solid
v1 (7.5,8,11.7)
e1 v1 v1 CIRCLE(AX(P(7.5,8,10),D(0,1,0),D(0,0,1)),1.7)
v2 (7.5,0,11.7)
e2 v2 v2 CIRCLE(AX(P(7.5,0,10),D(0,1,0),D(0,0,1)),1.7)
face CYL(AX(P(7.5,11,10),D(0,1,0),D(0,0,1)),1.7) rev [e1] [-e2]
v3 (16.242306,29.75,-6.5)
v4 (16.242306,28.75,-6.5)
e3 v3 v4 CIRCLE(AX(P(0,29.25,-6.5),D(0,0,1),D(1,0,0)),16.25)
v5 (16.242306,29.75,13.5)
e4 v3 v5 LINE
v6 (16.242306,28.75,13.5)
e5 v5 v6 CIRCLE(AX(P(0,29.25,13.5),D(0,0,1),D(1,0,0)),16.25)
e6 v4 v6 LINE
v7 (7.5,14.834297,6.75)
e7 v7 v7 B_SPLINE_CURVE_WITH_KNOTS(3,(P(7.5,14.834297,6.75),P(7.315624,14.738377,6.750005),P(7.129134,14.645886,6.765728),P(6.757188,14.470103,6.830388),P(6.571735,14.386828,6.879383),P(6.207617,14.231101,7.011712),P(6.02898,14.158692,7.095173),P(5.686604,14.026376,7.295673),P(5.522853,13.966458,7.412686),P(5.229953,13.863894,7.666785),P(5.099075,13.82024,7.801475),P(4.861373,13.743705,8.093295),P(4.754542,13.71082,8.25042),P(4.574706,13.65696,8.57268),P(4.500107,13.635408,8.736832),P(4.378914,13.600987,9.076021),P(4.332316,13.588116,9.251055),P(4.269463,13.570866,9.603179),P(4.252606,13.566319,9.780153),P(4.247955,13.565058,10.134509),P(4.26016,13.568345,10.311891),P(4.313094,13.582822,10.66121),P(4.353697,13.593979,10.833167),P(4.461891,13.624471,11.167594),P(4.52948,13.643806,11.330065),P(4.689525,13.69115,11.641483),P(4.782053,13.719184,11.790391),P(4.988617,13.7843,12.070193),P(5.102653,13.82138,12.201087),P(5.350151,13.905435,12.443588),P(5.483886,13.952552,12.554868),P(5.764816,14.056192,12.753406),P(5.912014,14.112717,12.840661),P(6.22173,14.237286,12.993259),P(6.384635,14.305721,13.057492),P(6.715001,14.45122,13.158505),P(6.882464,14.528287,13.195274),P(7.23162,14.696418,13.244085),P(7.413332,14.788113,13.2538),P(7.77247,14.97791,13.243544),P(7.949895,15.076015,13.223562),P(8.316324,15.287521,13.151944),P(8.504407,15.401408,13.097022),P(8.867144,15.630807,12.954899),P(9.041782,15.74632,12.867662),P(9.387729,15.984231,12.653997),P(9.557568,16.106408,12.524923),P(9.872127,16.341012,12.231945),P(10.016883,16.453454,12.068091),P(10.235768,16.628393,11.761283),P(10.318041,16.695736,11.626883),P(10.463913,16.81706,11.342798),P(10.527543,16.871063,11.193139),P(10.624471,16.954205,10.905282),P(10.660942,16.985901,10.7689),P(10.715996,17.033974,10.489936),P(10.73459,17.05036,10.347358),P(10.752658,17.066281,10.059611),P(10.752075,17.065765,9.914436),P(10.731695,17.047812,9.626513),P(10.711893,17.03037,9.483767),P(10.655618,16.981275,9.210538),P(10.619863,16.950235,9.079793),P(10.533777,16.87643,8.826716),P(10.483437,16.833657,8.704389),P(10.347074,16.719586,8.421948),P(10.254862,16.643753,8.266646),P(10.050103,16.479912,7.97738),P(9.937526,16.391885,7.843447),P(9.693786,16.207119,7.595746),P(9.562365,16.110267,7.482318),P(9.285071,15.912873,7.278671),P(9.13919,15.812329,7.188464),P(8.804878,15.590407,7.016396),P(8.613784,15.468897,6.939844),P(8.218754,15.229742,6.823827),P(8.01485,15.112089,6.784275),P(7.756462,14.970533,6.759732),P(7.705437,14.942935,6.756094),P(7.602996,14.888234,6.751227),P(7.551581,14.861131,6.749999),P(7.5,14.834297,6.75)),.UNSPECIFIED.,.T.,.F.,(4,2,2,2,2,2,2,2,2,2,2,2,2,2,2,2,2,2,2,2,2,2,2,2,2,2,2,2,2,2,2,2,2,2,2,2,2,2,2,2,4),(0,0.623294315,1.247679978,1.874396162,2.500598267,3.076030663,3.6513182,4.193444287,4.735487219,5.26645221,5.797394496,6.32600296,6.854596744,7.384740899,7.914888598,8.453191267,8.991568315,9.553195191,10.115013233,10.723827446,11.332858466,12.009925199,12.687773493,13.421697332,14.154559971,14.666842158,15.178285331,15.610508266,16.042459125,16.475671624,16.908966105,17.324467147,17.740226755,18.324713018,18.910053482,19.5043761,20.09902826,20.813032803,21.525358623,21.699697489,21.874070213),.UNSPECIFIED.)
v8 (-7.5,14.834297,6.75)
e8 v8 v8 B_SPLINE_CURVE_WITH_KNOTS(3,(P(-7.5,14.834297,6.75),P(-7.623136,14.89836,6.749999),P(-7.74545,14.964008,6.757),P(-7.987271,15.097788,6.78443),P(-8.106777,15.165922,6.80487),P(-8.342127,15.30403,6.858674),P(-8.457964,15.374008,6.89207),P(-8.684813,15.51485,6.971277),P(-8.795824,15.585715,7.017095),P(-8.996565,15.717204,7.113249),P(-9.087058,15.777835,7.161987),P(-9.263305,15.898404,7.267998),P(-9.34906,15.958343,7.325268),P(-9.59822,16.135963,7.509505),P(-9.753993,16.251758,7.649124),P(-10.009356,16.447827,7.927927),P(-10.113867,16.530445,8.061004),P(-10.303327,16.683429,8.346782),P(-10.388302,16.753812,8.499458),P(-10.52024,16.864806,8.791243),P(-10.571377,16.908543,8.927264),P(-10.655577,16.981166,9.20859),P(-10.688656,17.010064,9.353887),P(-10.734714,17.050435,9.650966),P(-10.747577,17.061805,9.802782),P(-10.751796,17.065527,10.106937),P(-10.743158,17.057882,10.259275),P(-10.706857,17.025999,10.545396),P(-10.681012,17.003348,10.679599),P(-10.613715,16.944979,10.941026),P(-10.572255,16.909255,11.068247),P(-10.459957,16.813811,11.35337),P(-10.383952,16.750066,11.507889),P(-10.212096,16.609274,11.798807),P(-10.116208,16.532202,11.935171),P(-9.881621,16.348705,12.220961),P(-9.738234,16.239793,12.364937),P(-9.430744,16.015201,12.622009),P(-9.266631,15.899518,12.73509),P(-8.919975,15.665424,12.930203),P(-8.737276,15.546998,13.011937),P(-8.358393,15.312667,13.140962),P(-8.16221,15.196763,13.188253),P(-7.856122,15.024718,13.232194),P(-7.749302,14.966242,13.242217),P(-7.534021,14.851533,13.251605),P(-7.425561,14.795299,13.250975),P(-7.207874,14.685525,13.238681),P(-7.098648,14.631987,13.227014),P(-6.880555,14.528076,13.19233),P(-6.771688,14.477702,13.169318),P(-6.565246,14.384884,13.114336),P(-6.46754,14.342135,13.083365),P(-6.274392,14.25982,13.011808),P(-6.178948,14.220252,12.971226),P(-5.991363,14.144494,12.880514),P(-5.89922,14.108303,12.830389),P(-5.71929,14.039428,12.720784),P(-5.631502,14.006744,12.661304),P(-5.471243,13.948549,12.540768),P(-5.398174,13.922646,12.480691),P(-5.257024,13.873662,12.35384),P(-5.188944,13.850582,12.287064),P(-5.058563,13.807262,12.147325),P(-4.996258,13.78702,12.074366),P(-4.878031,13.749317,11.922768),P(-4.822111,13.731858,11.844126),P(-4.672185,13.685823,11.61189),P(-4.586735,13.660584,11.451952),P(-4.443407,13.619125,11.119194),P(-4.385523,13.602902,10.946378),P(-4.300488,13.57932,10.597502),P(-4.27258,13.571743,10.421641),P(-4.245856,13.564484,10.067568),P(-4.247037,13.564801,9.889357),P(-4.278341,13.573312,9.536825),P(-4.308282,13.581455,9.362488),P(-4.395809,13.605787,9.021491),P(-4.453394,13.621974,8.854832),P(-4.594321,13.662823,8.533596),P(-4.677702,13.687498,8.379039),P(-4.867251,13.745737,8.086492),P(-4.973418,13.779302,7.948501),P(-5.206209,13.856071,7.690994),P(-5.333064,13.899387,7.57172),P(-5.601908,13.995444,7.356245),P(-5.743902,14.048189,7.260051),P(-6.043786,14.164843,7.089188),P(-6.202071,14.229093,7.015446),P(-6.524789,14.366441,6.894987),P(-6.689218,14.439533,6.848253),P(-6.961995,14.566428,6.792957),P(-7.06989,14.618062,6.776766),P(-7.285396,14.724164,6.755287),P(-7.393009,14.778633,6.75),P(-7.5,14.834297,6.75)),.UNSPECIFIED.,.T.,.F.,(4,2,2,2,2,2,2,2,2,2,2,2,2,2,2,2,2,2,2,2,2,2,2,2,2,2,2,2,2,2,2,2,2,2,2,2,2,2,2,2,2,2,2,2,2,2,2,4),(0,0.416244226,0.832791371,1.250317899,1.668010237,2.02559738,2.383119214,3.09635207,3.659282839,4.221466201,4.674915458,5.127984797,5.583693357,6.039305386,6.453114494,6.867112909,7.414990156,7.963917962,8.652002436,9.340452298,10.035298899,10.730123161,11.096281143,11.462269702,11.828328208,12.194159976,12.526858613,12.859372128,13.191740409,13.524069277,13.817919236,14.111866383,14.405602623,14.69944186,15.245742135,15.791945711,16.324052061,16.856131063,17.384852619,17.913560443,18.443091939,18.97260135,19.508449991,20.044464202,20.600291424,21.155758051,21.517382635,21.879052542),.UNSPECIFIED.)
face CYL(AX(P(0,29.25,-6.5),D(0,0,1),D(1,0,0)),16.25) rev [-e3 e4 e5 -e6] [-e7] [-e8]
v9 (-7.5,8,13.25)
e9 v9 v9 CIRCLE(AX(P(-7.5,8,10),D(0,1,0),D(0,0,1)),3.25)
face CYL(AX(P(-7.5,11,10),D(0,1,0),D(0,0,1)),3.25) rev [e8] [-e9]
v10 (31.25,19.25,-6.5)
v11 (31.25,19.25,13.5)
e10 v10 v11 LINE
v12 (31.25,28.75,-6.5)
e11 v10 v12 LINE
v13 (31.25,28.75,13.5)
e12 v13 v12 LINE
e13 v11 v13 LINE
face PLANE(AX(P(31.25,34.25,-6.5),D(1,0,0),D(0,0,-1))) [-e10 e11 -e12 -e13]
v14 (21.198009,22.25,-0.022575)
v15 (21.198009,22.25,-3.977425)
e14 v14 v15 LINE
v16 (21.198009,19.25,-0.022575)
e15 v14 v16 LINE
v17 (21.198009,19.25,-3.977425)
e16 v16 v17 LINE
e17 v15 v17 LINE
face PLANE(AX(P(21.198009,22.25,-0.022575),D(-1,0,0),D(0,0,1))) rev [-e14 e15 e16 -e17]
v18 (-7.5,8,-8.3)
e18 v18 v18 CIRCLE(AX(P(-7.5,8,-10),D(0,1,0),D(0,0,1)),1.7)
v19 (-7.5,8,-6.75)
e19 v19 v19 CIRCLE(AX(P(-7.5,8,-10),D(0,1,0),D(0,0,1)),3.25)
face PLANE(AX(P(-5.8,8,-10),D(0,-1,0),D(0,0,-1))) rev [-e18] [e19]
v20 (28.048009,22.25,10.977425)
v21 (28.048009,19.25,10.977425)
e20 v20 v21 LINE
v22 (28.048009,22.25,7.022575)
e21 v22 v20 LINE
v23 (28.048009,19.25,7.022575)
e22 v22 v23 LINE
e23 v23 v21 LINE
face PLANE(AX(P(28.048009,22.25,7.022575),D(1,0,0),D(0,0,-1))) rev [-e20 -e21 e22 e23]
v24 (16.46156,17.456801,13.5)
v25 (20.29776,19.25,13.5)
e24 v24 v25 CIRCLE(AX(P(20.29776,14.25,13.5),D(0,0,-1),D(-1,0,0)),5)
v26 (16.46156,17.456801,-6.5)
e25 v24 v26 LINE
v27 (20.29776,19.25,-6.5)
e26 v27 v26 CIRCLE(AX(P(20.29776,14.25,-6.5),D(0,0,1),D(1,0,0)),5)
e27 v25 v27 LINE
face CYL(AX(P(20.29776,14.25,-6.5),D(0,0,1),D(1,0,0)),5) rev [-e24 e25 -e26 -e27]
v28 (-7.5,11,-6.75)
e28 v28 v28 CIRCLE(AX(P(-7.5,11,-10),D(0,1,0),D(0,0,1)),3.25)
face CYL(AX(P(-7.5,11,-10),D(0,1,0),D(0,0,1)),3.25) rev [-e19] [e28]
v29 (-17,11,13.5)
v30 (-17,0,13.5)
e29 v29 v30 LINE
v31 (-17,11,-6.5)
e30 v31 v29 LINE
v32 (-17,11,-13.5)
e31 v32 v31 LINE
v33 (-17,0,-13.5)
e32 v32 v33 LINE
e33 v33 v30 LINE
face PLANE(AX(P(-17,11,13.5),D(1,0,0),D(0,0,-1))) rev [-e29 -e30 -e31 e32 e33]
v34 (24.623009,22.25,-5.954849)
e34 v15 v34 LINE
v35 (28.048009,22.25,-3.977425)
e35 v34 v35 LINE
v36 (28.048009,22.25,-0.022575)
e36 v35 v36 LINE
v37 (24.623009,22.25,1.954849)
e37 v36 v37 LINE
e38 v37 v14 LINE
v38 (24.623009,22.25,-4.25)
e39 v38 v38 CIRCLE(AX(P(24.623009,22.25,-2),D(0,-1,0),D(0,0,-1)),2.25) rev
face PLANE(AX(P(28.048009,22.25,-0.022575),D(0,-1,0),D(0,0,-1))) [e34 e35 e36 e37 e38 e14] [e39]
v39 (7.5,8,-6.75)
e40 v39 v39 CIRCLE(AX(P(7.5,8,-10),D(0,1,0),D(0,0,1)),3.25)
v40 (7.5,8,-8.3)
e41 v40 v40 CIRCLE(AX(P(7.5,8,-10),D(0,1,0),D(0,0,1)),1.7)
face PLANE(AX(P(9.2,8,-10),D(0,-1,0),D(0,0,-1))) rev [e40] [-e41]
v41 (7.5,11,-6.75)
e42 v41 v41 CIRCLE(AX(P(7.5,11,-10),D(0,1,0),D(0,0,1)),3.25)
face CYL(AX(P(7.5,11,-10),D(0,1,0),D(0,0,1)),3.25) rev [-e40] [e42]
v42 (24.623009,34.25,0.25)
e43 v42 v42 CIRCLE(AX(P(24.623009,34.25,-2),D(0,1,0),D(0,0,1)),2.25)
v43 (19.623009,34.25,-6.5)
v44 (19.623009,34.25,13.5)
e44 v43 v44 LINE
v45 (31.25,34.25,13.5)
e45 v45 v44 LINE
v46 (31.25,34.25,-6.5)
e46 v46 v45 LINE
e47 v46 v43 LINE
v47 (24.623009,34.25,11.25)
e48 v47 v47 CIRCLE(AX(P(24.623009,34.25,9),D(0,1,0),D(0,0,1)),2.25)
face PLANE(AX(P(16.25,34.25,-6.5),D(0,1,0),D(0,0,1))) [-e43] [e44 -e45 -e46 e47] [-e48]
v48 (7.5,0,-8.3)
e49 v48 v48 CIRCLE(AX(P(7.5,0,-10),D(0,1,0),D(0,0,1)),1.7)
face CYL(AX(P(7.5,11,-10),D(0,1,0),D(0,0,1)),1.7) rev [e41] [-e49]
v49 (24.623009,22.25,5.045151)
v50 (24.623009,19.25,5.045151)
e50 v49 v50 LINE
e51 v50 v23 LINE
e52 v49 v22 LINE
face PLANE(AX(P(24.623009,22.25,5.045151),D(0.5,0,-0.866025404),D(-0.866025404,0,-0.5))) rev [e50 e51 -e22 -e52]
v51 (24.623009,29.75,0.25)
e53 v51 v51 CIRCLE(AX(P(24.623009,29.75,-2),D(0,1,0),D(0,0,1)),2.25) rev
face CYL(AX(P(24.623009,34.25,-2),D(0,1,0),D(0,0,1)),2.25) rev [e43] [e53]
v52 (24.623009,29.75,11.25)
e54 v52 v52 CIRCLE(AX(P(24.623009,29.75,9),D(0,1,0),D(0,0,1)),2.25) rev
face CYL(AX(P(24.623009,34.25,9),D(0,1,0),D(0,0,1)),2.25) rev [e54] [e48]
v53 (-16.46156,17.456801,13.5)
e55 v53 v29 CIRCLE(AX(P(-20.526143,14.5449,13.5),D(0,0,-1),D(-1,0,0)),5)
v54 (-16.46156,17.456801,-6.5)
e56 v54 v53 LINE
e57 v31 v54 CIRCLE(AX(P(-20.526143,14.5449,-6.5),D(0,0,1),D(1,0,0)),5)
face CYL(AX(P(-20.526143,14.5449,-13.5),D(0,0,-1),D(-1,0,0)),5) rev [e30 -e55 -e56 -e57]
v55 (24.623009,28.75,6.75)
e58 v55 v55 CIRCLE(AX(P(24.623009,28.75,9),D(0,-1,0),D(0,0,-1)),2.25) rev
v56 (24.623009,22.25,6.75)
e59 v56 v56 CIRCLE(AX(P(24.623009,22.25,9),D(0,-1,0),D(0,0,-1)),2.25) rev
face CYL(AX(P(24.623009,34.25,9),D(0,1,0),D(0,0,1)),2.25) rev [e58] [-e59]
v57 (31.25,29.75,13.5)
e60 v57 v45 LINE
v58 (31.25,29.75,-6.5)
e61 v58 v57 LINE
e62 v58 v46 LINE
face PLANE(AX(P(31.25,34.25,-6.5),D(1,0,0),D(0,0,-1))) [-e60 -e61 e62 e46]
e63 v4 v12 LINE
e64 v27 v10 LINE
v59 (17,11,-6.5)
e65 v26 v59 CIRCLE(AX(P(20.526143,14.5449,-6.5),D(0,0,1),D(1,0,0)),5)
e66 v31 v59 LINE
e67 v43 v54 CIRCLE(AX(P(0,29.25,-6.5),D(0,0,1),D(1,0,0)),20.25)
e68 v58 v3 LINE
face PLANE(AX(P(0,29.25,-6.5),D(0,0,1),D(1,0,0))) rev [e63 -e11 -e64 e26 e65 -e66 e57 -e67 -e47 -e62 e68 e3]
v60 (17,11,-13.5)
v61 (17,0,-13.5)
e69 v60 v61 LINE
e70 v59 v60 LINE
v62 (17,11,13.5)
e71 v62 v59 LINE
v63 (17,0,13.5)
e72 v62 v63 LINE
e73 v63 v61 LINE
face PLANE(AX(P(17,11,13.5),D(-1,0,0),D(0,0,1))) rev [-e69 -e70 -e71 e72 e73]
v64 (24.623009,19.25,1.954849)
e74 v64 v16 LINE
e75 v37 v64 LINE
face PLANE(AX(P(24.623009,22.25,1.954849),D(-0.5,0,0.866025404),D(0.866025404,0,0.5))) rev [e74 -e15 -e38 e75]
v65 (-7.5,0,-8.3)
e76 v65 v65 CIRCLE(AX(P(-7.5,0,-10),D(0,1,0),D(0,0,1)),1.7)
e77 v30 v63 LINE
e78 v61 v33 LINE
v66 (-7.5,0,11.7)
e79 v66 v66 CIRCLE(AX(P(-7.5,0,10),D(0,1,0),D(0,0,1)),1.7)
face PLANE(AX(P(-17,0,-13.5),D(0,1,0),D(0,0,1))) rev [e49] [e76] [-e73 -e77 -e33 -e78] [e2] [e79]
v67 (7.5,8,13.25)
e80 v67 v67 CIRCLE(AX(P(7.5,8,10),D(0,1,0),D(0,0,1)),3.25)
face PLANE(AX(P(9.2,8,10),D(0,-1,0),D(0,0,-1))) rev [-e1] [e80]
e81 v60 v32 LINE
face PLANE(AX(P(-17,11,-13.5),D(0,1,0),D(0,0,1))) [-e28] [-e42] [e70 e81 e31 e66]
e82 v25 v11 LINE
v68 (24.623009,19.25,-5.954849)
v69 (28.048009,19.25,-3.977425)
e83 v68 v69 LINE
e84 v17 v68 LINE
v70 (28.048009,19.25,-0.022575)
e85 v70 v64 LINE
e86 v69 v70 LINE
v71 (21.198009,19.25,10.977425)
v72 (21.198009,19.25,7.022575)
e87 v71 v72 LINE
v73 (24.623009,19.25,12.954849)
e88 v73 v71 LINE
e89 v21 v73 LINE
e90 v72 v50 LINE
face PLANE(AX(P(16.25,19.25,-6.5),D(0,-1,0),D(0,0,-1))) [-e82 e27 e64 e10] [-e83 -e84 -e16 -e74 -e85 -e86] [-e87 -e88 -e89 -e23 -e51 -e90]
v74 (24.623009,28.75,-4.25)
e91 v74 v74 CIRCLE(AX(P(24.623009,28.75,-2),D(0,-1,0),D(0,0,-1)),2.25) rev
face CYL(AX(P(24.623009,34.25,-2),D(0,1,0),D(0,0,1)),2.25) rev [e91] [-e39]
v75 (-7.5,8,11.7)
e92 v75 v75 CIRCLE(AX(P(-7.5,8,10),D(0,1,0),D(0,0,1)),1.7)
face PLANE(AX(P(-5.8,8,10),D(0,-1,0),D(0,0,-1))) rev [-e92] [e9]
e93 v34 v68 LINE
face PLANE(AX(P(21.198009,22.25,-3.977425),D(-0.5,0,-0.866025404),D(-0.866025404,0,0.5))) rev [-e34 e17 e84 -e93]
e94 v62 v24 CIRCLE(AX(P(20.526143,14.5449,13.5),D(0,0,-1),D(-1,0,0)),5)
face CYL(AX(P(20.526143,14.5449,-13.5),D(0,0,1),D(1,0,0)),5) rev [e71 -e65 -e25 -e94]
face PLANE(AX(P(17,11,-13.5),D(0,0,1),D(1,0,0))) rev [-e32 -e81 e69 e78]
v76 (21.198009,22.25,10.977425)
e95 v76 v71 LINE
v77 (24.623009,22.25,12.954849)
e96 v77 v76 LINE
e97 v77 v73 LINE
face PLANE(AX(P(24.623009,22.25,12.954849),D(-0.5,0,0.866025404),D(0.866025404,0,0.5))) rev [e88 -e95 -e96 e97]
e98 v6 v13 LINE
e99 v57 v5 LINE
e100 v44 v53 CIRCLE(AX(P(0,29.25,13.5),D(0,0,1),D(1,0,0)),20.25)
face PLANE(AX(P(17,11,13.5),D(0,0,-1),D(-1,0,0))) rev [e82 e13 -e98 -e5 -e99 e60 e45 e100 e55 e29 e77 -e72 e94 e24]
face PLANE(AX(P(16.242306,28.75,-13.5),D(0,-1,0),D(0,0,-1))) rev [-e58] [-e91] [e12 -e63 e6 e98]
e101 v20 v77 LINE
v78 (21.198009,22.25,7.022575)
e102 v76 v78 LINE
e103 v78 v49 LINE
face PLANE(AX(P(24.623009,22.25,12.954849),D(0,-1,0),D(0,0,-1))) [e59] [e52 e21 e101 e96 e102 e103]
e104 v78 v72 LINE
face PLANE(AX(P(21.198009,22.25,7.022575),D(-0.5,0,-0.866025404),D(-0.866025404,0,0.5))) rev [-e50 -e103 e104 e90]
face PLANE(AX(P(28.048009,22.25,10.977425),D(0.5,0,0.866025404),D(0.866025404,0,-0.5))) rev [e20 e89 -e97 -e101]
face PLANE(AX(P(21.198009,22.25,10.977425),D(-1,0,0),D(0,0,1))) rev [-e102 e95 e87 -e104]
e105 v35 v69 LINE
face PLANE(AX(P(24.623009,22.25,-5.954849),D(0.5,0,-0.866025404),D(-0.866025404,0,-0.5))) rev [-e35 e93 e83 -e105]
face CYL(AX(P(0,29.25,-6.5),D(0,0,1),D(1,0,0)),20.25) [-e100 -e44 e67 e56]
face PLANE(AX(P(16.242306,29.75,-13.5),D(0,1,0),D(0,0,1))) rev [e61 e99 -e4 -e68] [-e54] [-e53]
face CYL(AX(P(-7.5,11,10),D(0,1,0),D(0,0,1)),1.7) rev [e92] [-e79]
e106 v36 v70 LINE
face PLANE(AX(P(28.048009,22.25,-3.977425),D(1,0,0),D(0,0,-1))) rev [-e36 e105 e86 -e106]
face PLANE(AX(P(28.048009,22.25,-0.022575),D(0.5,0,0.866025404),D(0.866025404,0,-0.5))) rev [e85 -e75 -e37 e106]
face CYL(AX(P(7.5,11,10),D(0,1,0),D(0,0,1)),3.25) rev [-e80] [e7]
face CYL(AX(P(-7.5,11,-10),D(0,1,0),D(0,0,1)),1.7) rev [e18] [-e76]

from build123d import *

# Parameters (mm, degrees)
SKETCH1_W                     = 34
SKETCH1_H                     = 27
BOSS_EXTRUDE1_DEPTH           = 11
SKETCH2_R                     = 20.25
SKETCH2_R_2                   = 16.25
MOTOR_CLAMP_BAND_DEPTH        = 20
FILLET4_R                     = 5
SKETCH7_W                     = 15
SKETCH7_H                     = 15
BOSS_EXTRUDE3_DEPTH           = 20
FILLET5_R                     = 5
CBORE_FOR_M3_SHCS1_AT_2_COUNT = 2
CBORE_FOR_M3_SHCS1_AT_2_PITCH = 15
CBORE_FOR_M3_SHCS1_AT_3_COUNT = 2
CBORE_FOR_M3_SHCS1_AT_3_PITCH = 25
CBORE_FOR_M3_SHCS1_AT_4_COUNT = 2
CBORE_FOR_M3_SHCS1_AT_4_PITCH = 20
EXTENDED_START                = 15
SKETCH6_R                     = 3.25
EXTENDED_COUNTERBORE_1_DEPTH  = 15
M4_CLEARANCE_HOLE1_D          = 4.5
CUT_EXTRUDE2_DEPTH            = 3
SKETCH14_W                    = 15.007694129
SKETCH14_H                    = 1
CUT_EXTRUDE3_DEPTH            = 65.465591597
FILLET3_R                     = 5


with BuildPart() as part:
    # Sketch1 → Boss-Extrude1 (new body)
    with BuildSketch(Plane(origin=(0, 0, 0), x_dir=(1, 0, 0), z_dir=(0, 1, 0))):
        Rectangle(SKETCH1_W, SKETCH1_H)
    extrude(amount=BOSS_EXTRUDE1_DEPTH)

    # Sketch2 → Motor Clamp Band (add)
    with BuildSketch(Plane.XY.offset(13.5)):
        with Locations((0, 29.25)):
            Circle(SKETCH2_R)
        with Locations((0, 29.25)):
            Circle(SKETCH2_R_2, mode=Mode.SUBTRACT)
    extrude(amount=-MOTOR_CLAMP_BAND_DEPTH)

    # Fillet4
    # the kernel refuses this fillet: 5 mm, written as the material it adds along each edge
    with BuildSketch(Plane(origin=(8.774964387, 11, -6.5), x_dir=(0.7657018852259857, 0.6431956335061453, 0), z_dir=(0, 0, 1))) as fillet4_piece_1:
        with BuildLine():
            CenterArc((11.27796375, -4.843969922), FILLET4_R, 104.351347878, 80.770115484)
            Line((6.297925275, -5.290306991), (6.198324505, -5.299233733))
            ThreePointArc((6.198324505, -5.299233733), (3.084643074, -2.721723684), (-0.064319563, -0.076570189))
            Line((-0.064319563, -0.076570189), (0.024786734, 0.096879398))
            ThreePointArc((0.024786734, 0.096879398), (5.019313537, -0.531921816), (10.013840341, 0.096879398))
            Line((10.013840341, 0.096879398), (10.038627075, 0))
        make_face()
    extrude(amount=20)

    # Sketch7 → Boss-Extrude3 (add)
    with BuildSketch(Plane.XY.offset(13.5)):
        with Locations((23.75, 26.75)):
            Rectangle(SKETCH7_W, SKETCH7_H)
    extrude(amount=-BOSS_EXTRUDE3_DEPTH)

    # Fillet5
    # the kernel refuses this fillet: 5 mm, written as the material it adds along each edge
    with BuildSketch(Plane(origin=(-8.774964387, 11, -6.5), x_dir=(-1, 0, 0), z_dir=(0, 0, 1))) as fillet5_piece_1:
        with BuildLine():
            CenterArc((11.751178408, -3.544900138), FILLET5_R, 134.848011946, 80.770115484)
            Line((7.686595676, -6.456801101), (7.605304021, -6.51503912))
            ThreePointArc((7.605304021, -6.51503912), (4.185427628, -2.821107013), (-0.043333157, -0.090123457))
            Line((-0.043333157, -0.090123457), (0, 0.1))
            ThreePointArc((0, 0.1), (4.112517806, 0.1), (8.154512757, 0.070898003))
            Line((8.154512757, 0.070898003), (8.225035613, 0))
        make_face()
    extrude(amount=20)

    # Sketch4 → CBORE for M3 SHCS1 (revolve, cut)
    with BuildSketch(Plane(origin=(7.5, 11, -10), x_dir=(0, 0, 1), z_dir=(1, 0, 0))):
        Polygon((0, 0), (0, 11), (1.7, 11), (1.7, 3), (3.25, 3), (3.25, 0), align=None)
    cbore_for_m3_shcs1 = revolve(axis=Axis((7.5, 17.35, -10), (0, -1, 0)), mode=Mode.SUBTRACT)

    # CBORE for M3 SHCS1 at 2: CBORE for M3 SHCS1 ×2
    with Locations(*[(-i * CBORE_FOR_M3_SHCS1_AT_2_PITCH, 0, 0) for i in range(1, CBORE_FOR_M3_SHCS1_AT_2_COUNT)]):
        add(cbore_for_m3_shcs1, mode=Mode.SUBTRACT)

    # CBORE for M3 SHCS1 at 3: CBORE for M3 SHCS1 ×2
    with Locations(*[Vector(-0.5999999999999989, 0, 0.8000000000000009) * (i * CBORE_FOR_M3_SHCS1_AT_3_PITCH) for i in range(1, CBORE_FOR_M3_SHCS1_AT_3_COUNT)]):
        add(cbore_for_m3_shcs1, mode=Mode.SUBTRACT)

    # CBORE for M3 SHCS1 at 4: CBORE for M3 SHCS1 ×2
    with Locations(*[(0, 0, i * CBORE_FOR_M3_SHCS1_AT_4_PITCH) for i in range(1, CBORE_FOR_M3_SHCS1_AT_4_COUNT)]):
        add(cbore_for_m3_shcs1, mode=Mode.SUBTRACT)

    # Sketch6 → Extended CounterBore 1 (cut)
    with BuildSketch(Plane(origin=(0, 11, 0), x_dir=(1, 0, 0), z_dir=(0, 1, 0)).offset(EXTENDED_START)):
        with Locations(Location((7.5, -10, 0), (0, 0, 270))):
            Circle(SKETCH6_R)
        with Locations(Location((-7.5, -10, 0), (0, 0, 270))):
            Circle(SKETCH6_R)
    extrude(amount=-EXTENDED_COUNTERBORE_1_DEPTH, mode=Mode.SUBTRACT)

    # M4 Clearance Hole1 (through all)
    with Locations(Plane(origin=(0, 34.25, 0), x_dir=(-1, 0, 0), z_dir=(0, 1, 0))):
        with Locations((-24.623009453, -2), (-24.623009453, 9)):
            Hole(M4_CLEARANCE_HOLE1_D / 2)

    # Sketch13 → Cut-Extrude2 (cut)
    with BuildSketch(Plane.XZ.offset(-19.25)):
        Polygon((24.623009453, 12.954849344), (21.198009453, 10.977424672), (21.198009453, 7.022575328), (24.623009453, 5.045150656), (28.048009453, 7.022575328), (28.048009453, 10.977424672), align=None)
        Polygon((28.048009453, -0.022575328), (24.623009453, 1.954849344), (21.198009453, -0.022575328), (21.198009453, -3.977424672), (24.623009453, -5.954849344), (28.048009453, -3.977424672), align=None)
    extrude(amount=-CUT_EXTRUDE2_DEPTH, mode=Mode.SUBTRACT)

    # Sketch14 → Cut-Extrude3 (cut, through all)
    with BuildSketch(Plane.XY.offset(13.5)):
        with Locations((23.746152936, 29.25)):
            Rectangle(SKETCH14_W, SKETCH14_H)
    extrude(amount=-CUT_EXTRUDE3_DEPTH, mode=Mode.SUBTRACT)

    # Fillet3
    # the kernel refuses this fillet: 5 mm, written as the material it adds along each edge
    with BuildSketch(Plane(origin=(17.608591653, 19.25, -6.5), x_dir=(-0.5388484844645524, -0.8424027010820033, 0), z_dir=(0, 0, 1))) as fillet3_piece_1:
        with BuildLine():
            CenterArc((2.762959446, 4.959604744), FILLET3_R, 212.605284551, 50.106677373)
            Line((-1.44905406, 2.265362322), (-1.53329433, 2.211477474))
            Line((-1.53329433, 2.211477474), (-0.08424027, -0.053884848))
            Line((-0.08424027, -0.053884848), (0.00525598, -0.099861778))
            ThreePointArc((0.00525598, -0.099861778), (1.064335915, -0.072010015), (2.115986078, -0.099192095))
            Line((2.115986078, -0.099192095), (2.12867183, 0))
        make_face()
    extrude(amount=20)


solid = part.part
